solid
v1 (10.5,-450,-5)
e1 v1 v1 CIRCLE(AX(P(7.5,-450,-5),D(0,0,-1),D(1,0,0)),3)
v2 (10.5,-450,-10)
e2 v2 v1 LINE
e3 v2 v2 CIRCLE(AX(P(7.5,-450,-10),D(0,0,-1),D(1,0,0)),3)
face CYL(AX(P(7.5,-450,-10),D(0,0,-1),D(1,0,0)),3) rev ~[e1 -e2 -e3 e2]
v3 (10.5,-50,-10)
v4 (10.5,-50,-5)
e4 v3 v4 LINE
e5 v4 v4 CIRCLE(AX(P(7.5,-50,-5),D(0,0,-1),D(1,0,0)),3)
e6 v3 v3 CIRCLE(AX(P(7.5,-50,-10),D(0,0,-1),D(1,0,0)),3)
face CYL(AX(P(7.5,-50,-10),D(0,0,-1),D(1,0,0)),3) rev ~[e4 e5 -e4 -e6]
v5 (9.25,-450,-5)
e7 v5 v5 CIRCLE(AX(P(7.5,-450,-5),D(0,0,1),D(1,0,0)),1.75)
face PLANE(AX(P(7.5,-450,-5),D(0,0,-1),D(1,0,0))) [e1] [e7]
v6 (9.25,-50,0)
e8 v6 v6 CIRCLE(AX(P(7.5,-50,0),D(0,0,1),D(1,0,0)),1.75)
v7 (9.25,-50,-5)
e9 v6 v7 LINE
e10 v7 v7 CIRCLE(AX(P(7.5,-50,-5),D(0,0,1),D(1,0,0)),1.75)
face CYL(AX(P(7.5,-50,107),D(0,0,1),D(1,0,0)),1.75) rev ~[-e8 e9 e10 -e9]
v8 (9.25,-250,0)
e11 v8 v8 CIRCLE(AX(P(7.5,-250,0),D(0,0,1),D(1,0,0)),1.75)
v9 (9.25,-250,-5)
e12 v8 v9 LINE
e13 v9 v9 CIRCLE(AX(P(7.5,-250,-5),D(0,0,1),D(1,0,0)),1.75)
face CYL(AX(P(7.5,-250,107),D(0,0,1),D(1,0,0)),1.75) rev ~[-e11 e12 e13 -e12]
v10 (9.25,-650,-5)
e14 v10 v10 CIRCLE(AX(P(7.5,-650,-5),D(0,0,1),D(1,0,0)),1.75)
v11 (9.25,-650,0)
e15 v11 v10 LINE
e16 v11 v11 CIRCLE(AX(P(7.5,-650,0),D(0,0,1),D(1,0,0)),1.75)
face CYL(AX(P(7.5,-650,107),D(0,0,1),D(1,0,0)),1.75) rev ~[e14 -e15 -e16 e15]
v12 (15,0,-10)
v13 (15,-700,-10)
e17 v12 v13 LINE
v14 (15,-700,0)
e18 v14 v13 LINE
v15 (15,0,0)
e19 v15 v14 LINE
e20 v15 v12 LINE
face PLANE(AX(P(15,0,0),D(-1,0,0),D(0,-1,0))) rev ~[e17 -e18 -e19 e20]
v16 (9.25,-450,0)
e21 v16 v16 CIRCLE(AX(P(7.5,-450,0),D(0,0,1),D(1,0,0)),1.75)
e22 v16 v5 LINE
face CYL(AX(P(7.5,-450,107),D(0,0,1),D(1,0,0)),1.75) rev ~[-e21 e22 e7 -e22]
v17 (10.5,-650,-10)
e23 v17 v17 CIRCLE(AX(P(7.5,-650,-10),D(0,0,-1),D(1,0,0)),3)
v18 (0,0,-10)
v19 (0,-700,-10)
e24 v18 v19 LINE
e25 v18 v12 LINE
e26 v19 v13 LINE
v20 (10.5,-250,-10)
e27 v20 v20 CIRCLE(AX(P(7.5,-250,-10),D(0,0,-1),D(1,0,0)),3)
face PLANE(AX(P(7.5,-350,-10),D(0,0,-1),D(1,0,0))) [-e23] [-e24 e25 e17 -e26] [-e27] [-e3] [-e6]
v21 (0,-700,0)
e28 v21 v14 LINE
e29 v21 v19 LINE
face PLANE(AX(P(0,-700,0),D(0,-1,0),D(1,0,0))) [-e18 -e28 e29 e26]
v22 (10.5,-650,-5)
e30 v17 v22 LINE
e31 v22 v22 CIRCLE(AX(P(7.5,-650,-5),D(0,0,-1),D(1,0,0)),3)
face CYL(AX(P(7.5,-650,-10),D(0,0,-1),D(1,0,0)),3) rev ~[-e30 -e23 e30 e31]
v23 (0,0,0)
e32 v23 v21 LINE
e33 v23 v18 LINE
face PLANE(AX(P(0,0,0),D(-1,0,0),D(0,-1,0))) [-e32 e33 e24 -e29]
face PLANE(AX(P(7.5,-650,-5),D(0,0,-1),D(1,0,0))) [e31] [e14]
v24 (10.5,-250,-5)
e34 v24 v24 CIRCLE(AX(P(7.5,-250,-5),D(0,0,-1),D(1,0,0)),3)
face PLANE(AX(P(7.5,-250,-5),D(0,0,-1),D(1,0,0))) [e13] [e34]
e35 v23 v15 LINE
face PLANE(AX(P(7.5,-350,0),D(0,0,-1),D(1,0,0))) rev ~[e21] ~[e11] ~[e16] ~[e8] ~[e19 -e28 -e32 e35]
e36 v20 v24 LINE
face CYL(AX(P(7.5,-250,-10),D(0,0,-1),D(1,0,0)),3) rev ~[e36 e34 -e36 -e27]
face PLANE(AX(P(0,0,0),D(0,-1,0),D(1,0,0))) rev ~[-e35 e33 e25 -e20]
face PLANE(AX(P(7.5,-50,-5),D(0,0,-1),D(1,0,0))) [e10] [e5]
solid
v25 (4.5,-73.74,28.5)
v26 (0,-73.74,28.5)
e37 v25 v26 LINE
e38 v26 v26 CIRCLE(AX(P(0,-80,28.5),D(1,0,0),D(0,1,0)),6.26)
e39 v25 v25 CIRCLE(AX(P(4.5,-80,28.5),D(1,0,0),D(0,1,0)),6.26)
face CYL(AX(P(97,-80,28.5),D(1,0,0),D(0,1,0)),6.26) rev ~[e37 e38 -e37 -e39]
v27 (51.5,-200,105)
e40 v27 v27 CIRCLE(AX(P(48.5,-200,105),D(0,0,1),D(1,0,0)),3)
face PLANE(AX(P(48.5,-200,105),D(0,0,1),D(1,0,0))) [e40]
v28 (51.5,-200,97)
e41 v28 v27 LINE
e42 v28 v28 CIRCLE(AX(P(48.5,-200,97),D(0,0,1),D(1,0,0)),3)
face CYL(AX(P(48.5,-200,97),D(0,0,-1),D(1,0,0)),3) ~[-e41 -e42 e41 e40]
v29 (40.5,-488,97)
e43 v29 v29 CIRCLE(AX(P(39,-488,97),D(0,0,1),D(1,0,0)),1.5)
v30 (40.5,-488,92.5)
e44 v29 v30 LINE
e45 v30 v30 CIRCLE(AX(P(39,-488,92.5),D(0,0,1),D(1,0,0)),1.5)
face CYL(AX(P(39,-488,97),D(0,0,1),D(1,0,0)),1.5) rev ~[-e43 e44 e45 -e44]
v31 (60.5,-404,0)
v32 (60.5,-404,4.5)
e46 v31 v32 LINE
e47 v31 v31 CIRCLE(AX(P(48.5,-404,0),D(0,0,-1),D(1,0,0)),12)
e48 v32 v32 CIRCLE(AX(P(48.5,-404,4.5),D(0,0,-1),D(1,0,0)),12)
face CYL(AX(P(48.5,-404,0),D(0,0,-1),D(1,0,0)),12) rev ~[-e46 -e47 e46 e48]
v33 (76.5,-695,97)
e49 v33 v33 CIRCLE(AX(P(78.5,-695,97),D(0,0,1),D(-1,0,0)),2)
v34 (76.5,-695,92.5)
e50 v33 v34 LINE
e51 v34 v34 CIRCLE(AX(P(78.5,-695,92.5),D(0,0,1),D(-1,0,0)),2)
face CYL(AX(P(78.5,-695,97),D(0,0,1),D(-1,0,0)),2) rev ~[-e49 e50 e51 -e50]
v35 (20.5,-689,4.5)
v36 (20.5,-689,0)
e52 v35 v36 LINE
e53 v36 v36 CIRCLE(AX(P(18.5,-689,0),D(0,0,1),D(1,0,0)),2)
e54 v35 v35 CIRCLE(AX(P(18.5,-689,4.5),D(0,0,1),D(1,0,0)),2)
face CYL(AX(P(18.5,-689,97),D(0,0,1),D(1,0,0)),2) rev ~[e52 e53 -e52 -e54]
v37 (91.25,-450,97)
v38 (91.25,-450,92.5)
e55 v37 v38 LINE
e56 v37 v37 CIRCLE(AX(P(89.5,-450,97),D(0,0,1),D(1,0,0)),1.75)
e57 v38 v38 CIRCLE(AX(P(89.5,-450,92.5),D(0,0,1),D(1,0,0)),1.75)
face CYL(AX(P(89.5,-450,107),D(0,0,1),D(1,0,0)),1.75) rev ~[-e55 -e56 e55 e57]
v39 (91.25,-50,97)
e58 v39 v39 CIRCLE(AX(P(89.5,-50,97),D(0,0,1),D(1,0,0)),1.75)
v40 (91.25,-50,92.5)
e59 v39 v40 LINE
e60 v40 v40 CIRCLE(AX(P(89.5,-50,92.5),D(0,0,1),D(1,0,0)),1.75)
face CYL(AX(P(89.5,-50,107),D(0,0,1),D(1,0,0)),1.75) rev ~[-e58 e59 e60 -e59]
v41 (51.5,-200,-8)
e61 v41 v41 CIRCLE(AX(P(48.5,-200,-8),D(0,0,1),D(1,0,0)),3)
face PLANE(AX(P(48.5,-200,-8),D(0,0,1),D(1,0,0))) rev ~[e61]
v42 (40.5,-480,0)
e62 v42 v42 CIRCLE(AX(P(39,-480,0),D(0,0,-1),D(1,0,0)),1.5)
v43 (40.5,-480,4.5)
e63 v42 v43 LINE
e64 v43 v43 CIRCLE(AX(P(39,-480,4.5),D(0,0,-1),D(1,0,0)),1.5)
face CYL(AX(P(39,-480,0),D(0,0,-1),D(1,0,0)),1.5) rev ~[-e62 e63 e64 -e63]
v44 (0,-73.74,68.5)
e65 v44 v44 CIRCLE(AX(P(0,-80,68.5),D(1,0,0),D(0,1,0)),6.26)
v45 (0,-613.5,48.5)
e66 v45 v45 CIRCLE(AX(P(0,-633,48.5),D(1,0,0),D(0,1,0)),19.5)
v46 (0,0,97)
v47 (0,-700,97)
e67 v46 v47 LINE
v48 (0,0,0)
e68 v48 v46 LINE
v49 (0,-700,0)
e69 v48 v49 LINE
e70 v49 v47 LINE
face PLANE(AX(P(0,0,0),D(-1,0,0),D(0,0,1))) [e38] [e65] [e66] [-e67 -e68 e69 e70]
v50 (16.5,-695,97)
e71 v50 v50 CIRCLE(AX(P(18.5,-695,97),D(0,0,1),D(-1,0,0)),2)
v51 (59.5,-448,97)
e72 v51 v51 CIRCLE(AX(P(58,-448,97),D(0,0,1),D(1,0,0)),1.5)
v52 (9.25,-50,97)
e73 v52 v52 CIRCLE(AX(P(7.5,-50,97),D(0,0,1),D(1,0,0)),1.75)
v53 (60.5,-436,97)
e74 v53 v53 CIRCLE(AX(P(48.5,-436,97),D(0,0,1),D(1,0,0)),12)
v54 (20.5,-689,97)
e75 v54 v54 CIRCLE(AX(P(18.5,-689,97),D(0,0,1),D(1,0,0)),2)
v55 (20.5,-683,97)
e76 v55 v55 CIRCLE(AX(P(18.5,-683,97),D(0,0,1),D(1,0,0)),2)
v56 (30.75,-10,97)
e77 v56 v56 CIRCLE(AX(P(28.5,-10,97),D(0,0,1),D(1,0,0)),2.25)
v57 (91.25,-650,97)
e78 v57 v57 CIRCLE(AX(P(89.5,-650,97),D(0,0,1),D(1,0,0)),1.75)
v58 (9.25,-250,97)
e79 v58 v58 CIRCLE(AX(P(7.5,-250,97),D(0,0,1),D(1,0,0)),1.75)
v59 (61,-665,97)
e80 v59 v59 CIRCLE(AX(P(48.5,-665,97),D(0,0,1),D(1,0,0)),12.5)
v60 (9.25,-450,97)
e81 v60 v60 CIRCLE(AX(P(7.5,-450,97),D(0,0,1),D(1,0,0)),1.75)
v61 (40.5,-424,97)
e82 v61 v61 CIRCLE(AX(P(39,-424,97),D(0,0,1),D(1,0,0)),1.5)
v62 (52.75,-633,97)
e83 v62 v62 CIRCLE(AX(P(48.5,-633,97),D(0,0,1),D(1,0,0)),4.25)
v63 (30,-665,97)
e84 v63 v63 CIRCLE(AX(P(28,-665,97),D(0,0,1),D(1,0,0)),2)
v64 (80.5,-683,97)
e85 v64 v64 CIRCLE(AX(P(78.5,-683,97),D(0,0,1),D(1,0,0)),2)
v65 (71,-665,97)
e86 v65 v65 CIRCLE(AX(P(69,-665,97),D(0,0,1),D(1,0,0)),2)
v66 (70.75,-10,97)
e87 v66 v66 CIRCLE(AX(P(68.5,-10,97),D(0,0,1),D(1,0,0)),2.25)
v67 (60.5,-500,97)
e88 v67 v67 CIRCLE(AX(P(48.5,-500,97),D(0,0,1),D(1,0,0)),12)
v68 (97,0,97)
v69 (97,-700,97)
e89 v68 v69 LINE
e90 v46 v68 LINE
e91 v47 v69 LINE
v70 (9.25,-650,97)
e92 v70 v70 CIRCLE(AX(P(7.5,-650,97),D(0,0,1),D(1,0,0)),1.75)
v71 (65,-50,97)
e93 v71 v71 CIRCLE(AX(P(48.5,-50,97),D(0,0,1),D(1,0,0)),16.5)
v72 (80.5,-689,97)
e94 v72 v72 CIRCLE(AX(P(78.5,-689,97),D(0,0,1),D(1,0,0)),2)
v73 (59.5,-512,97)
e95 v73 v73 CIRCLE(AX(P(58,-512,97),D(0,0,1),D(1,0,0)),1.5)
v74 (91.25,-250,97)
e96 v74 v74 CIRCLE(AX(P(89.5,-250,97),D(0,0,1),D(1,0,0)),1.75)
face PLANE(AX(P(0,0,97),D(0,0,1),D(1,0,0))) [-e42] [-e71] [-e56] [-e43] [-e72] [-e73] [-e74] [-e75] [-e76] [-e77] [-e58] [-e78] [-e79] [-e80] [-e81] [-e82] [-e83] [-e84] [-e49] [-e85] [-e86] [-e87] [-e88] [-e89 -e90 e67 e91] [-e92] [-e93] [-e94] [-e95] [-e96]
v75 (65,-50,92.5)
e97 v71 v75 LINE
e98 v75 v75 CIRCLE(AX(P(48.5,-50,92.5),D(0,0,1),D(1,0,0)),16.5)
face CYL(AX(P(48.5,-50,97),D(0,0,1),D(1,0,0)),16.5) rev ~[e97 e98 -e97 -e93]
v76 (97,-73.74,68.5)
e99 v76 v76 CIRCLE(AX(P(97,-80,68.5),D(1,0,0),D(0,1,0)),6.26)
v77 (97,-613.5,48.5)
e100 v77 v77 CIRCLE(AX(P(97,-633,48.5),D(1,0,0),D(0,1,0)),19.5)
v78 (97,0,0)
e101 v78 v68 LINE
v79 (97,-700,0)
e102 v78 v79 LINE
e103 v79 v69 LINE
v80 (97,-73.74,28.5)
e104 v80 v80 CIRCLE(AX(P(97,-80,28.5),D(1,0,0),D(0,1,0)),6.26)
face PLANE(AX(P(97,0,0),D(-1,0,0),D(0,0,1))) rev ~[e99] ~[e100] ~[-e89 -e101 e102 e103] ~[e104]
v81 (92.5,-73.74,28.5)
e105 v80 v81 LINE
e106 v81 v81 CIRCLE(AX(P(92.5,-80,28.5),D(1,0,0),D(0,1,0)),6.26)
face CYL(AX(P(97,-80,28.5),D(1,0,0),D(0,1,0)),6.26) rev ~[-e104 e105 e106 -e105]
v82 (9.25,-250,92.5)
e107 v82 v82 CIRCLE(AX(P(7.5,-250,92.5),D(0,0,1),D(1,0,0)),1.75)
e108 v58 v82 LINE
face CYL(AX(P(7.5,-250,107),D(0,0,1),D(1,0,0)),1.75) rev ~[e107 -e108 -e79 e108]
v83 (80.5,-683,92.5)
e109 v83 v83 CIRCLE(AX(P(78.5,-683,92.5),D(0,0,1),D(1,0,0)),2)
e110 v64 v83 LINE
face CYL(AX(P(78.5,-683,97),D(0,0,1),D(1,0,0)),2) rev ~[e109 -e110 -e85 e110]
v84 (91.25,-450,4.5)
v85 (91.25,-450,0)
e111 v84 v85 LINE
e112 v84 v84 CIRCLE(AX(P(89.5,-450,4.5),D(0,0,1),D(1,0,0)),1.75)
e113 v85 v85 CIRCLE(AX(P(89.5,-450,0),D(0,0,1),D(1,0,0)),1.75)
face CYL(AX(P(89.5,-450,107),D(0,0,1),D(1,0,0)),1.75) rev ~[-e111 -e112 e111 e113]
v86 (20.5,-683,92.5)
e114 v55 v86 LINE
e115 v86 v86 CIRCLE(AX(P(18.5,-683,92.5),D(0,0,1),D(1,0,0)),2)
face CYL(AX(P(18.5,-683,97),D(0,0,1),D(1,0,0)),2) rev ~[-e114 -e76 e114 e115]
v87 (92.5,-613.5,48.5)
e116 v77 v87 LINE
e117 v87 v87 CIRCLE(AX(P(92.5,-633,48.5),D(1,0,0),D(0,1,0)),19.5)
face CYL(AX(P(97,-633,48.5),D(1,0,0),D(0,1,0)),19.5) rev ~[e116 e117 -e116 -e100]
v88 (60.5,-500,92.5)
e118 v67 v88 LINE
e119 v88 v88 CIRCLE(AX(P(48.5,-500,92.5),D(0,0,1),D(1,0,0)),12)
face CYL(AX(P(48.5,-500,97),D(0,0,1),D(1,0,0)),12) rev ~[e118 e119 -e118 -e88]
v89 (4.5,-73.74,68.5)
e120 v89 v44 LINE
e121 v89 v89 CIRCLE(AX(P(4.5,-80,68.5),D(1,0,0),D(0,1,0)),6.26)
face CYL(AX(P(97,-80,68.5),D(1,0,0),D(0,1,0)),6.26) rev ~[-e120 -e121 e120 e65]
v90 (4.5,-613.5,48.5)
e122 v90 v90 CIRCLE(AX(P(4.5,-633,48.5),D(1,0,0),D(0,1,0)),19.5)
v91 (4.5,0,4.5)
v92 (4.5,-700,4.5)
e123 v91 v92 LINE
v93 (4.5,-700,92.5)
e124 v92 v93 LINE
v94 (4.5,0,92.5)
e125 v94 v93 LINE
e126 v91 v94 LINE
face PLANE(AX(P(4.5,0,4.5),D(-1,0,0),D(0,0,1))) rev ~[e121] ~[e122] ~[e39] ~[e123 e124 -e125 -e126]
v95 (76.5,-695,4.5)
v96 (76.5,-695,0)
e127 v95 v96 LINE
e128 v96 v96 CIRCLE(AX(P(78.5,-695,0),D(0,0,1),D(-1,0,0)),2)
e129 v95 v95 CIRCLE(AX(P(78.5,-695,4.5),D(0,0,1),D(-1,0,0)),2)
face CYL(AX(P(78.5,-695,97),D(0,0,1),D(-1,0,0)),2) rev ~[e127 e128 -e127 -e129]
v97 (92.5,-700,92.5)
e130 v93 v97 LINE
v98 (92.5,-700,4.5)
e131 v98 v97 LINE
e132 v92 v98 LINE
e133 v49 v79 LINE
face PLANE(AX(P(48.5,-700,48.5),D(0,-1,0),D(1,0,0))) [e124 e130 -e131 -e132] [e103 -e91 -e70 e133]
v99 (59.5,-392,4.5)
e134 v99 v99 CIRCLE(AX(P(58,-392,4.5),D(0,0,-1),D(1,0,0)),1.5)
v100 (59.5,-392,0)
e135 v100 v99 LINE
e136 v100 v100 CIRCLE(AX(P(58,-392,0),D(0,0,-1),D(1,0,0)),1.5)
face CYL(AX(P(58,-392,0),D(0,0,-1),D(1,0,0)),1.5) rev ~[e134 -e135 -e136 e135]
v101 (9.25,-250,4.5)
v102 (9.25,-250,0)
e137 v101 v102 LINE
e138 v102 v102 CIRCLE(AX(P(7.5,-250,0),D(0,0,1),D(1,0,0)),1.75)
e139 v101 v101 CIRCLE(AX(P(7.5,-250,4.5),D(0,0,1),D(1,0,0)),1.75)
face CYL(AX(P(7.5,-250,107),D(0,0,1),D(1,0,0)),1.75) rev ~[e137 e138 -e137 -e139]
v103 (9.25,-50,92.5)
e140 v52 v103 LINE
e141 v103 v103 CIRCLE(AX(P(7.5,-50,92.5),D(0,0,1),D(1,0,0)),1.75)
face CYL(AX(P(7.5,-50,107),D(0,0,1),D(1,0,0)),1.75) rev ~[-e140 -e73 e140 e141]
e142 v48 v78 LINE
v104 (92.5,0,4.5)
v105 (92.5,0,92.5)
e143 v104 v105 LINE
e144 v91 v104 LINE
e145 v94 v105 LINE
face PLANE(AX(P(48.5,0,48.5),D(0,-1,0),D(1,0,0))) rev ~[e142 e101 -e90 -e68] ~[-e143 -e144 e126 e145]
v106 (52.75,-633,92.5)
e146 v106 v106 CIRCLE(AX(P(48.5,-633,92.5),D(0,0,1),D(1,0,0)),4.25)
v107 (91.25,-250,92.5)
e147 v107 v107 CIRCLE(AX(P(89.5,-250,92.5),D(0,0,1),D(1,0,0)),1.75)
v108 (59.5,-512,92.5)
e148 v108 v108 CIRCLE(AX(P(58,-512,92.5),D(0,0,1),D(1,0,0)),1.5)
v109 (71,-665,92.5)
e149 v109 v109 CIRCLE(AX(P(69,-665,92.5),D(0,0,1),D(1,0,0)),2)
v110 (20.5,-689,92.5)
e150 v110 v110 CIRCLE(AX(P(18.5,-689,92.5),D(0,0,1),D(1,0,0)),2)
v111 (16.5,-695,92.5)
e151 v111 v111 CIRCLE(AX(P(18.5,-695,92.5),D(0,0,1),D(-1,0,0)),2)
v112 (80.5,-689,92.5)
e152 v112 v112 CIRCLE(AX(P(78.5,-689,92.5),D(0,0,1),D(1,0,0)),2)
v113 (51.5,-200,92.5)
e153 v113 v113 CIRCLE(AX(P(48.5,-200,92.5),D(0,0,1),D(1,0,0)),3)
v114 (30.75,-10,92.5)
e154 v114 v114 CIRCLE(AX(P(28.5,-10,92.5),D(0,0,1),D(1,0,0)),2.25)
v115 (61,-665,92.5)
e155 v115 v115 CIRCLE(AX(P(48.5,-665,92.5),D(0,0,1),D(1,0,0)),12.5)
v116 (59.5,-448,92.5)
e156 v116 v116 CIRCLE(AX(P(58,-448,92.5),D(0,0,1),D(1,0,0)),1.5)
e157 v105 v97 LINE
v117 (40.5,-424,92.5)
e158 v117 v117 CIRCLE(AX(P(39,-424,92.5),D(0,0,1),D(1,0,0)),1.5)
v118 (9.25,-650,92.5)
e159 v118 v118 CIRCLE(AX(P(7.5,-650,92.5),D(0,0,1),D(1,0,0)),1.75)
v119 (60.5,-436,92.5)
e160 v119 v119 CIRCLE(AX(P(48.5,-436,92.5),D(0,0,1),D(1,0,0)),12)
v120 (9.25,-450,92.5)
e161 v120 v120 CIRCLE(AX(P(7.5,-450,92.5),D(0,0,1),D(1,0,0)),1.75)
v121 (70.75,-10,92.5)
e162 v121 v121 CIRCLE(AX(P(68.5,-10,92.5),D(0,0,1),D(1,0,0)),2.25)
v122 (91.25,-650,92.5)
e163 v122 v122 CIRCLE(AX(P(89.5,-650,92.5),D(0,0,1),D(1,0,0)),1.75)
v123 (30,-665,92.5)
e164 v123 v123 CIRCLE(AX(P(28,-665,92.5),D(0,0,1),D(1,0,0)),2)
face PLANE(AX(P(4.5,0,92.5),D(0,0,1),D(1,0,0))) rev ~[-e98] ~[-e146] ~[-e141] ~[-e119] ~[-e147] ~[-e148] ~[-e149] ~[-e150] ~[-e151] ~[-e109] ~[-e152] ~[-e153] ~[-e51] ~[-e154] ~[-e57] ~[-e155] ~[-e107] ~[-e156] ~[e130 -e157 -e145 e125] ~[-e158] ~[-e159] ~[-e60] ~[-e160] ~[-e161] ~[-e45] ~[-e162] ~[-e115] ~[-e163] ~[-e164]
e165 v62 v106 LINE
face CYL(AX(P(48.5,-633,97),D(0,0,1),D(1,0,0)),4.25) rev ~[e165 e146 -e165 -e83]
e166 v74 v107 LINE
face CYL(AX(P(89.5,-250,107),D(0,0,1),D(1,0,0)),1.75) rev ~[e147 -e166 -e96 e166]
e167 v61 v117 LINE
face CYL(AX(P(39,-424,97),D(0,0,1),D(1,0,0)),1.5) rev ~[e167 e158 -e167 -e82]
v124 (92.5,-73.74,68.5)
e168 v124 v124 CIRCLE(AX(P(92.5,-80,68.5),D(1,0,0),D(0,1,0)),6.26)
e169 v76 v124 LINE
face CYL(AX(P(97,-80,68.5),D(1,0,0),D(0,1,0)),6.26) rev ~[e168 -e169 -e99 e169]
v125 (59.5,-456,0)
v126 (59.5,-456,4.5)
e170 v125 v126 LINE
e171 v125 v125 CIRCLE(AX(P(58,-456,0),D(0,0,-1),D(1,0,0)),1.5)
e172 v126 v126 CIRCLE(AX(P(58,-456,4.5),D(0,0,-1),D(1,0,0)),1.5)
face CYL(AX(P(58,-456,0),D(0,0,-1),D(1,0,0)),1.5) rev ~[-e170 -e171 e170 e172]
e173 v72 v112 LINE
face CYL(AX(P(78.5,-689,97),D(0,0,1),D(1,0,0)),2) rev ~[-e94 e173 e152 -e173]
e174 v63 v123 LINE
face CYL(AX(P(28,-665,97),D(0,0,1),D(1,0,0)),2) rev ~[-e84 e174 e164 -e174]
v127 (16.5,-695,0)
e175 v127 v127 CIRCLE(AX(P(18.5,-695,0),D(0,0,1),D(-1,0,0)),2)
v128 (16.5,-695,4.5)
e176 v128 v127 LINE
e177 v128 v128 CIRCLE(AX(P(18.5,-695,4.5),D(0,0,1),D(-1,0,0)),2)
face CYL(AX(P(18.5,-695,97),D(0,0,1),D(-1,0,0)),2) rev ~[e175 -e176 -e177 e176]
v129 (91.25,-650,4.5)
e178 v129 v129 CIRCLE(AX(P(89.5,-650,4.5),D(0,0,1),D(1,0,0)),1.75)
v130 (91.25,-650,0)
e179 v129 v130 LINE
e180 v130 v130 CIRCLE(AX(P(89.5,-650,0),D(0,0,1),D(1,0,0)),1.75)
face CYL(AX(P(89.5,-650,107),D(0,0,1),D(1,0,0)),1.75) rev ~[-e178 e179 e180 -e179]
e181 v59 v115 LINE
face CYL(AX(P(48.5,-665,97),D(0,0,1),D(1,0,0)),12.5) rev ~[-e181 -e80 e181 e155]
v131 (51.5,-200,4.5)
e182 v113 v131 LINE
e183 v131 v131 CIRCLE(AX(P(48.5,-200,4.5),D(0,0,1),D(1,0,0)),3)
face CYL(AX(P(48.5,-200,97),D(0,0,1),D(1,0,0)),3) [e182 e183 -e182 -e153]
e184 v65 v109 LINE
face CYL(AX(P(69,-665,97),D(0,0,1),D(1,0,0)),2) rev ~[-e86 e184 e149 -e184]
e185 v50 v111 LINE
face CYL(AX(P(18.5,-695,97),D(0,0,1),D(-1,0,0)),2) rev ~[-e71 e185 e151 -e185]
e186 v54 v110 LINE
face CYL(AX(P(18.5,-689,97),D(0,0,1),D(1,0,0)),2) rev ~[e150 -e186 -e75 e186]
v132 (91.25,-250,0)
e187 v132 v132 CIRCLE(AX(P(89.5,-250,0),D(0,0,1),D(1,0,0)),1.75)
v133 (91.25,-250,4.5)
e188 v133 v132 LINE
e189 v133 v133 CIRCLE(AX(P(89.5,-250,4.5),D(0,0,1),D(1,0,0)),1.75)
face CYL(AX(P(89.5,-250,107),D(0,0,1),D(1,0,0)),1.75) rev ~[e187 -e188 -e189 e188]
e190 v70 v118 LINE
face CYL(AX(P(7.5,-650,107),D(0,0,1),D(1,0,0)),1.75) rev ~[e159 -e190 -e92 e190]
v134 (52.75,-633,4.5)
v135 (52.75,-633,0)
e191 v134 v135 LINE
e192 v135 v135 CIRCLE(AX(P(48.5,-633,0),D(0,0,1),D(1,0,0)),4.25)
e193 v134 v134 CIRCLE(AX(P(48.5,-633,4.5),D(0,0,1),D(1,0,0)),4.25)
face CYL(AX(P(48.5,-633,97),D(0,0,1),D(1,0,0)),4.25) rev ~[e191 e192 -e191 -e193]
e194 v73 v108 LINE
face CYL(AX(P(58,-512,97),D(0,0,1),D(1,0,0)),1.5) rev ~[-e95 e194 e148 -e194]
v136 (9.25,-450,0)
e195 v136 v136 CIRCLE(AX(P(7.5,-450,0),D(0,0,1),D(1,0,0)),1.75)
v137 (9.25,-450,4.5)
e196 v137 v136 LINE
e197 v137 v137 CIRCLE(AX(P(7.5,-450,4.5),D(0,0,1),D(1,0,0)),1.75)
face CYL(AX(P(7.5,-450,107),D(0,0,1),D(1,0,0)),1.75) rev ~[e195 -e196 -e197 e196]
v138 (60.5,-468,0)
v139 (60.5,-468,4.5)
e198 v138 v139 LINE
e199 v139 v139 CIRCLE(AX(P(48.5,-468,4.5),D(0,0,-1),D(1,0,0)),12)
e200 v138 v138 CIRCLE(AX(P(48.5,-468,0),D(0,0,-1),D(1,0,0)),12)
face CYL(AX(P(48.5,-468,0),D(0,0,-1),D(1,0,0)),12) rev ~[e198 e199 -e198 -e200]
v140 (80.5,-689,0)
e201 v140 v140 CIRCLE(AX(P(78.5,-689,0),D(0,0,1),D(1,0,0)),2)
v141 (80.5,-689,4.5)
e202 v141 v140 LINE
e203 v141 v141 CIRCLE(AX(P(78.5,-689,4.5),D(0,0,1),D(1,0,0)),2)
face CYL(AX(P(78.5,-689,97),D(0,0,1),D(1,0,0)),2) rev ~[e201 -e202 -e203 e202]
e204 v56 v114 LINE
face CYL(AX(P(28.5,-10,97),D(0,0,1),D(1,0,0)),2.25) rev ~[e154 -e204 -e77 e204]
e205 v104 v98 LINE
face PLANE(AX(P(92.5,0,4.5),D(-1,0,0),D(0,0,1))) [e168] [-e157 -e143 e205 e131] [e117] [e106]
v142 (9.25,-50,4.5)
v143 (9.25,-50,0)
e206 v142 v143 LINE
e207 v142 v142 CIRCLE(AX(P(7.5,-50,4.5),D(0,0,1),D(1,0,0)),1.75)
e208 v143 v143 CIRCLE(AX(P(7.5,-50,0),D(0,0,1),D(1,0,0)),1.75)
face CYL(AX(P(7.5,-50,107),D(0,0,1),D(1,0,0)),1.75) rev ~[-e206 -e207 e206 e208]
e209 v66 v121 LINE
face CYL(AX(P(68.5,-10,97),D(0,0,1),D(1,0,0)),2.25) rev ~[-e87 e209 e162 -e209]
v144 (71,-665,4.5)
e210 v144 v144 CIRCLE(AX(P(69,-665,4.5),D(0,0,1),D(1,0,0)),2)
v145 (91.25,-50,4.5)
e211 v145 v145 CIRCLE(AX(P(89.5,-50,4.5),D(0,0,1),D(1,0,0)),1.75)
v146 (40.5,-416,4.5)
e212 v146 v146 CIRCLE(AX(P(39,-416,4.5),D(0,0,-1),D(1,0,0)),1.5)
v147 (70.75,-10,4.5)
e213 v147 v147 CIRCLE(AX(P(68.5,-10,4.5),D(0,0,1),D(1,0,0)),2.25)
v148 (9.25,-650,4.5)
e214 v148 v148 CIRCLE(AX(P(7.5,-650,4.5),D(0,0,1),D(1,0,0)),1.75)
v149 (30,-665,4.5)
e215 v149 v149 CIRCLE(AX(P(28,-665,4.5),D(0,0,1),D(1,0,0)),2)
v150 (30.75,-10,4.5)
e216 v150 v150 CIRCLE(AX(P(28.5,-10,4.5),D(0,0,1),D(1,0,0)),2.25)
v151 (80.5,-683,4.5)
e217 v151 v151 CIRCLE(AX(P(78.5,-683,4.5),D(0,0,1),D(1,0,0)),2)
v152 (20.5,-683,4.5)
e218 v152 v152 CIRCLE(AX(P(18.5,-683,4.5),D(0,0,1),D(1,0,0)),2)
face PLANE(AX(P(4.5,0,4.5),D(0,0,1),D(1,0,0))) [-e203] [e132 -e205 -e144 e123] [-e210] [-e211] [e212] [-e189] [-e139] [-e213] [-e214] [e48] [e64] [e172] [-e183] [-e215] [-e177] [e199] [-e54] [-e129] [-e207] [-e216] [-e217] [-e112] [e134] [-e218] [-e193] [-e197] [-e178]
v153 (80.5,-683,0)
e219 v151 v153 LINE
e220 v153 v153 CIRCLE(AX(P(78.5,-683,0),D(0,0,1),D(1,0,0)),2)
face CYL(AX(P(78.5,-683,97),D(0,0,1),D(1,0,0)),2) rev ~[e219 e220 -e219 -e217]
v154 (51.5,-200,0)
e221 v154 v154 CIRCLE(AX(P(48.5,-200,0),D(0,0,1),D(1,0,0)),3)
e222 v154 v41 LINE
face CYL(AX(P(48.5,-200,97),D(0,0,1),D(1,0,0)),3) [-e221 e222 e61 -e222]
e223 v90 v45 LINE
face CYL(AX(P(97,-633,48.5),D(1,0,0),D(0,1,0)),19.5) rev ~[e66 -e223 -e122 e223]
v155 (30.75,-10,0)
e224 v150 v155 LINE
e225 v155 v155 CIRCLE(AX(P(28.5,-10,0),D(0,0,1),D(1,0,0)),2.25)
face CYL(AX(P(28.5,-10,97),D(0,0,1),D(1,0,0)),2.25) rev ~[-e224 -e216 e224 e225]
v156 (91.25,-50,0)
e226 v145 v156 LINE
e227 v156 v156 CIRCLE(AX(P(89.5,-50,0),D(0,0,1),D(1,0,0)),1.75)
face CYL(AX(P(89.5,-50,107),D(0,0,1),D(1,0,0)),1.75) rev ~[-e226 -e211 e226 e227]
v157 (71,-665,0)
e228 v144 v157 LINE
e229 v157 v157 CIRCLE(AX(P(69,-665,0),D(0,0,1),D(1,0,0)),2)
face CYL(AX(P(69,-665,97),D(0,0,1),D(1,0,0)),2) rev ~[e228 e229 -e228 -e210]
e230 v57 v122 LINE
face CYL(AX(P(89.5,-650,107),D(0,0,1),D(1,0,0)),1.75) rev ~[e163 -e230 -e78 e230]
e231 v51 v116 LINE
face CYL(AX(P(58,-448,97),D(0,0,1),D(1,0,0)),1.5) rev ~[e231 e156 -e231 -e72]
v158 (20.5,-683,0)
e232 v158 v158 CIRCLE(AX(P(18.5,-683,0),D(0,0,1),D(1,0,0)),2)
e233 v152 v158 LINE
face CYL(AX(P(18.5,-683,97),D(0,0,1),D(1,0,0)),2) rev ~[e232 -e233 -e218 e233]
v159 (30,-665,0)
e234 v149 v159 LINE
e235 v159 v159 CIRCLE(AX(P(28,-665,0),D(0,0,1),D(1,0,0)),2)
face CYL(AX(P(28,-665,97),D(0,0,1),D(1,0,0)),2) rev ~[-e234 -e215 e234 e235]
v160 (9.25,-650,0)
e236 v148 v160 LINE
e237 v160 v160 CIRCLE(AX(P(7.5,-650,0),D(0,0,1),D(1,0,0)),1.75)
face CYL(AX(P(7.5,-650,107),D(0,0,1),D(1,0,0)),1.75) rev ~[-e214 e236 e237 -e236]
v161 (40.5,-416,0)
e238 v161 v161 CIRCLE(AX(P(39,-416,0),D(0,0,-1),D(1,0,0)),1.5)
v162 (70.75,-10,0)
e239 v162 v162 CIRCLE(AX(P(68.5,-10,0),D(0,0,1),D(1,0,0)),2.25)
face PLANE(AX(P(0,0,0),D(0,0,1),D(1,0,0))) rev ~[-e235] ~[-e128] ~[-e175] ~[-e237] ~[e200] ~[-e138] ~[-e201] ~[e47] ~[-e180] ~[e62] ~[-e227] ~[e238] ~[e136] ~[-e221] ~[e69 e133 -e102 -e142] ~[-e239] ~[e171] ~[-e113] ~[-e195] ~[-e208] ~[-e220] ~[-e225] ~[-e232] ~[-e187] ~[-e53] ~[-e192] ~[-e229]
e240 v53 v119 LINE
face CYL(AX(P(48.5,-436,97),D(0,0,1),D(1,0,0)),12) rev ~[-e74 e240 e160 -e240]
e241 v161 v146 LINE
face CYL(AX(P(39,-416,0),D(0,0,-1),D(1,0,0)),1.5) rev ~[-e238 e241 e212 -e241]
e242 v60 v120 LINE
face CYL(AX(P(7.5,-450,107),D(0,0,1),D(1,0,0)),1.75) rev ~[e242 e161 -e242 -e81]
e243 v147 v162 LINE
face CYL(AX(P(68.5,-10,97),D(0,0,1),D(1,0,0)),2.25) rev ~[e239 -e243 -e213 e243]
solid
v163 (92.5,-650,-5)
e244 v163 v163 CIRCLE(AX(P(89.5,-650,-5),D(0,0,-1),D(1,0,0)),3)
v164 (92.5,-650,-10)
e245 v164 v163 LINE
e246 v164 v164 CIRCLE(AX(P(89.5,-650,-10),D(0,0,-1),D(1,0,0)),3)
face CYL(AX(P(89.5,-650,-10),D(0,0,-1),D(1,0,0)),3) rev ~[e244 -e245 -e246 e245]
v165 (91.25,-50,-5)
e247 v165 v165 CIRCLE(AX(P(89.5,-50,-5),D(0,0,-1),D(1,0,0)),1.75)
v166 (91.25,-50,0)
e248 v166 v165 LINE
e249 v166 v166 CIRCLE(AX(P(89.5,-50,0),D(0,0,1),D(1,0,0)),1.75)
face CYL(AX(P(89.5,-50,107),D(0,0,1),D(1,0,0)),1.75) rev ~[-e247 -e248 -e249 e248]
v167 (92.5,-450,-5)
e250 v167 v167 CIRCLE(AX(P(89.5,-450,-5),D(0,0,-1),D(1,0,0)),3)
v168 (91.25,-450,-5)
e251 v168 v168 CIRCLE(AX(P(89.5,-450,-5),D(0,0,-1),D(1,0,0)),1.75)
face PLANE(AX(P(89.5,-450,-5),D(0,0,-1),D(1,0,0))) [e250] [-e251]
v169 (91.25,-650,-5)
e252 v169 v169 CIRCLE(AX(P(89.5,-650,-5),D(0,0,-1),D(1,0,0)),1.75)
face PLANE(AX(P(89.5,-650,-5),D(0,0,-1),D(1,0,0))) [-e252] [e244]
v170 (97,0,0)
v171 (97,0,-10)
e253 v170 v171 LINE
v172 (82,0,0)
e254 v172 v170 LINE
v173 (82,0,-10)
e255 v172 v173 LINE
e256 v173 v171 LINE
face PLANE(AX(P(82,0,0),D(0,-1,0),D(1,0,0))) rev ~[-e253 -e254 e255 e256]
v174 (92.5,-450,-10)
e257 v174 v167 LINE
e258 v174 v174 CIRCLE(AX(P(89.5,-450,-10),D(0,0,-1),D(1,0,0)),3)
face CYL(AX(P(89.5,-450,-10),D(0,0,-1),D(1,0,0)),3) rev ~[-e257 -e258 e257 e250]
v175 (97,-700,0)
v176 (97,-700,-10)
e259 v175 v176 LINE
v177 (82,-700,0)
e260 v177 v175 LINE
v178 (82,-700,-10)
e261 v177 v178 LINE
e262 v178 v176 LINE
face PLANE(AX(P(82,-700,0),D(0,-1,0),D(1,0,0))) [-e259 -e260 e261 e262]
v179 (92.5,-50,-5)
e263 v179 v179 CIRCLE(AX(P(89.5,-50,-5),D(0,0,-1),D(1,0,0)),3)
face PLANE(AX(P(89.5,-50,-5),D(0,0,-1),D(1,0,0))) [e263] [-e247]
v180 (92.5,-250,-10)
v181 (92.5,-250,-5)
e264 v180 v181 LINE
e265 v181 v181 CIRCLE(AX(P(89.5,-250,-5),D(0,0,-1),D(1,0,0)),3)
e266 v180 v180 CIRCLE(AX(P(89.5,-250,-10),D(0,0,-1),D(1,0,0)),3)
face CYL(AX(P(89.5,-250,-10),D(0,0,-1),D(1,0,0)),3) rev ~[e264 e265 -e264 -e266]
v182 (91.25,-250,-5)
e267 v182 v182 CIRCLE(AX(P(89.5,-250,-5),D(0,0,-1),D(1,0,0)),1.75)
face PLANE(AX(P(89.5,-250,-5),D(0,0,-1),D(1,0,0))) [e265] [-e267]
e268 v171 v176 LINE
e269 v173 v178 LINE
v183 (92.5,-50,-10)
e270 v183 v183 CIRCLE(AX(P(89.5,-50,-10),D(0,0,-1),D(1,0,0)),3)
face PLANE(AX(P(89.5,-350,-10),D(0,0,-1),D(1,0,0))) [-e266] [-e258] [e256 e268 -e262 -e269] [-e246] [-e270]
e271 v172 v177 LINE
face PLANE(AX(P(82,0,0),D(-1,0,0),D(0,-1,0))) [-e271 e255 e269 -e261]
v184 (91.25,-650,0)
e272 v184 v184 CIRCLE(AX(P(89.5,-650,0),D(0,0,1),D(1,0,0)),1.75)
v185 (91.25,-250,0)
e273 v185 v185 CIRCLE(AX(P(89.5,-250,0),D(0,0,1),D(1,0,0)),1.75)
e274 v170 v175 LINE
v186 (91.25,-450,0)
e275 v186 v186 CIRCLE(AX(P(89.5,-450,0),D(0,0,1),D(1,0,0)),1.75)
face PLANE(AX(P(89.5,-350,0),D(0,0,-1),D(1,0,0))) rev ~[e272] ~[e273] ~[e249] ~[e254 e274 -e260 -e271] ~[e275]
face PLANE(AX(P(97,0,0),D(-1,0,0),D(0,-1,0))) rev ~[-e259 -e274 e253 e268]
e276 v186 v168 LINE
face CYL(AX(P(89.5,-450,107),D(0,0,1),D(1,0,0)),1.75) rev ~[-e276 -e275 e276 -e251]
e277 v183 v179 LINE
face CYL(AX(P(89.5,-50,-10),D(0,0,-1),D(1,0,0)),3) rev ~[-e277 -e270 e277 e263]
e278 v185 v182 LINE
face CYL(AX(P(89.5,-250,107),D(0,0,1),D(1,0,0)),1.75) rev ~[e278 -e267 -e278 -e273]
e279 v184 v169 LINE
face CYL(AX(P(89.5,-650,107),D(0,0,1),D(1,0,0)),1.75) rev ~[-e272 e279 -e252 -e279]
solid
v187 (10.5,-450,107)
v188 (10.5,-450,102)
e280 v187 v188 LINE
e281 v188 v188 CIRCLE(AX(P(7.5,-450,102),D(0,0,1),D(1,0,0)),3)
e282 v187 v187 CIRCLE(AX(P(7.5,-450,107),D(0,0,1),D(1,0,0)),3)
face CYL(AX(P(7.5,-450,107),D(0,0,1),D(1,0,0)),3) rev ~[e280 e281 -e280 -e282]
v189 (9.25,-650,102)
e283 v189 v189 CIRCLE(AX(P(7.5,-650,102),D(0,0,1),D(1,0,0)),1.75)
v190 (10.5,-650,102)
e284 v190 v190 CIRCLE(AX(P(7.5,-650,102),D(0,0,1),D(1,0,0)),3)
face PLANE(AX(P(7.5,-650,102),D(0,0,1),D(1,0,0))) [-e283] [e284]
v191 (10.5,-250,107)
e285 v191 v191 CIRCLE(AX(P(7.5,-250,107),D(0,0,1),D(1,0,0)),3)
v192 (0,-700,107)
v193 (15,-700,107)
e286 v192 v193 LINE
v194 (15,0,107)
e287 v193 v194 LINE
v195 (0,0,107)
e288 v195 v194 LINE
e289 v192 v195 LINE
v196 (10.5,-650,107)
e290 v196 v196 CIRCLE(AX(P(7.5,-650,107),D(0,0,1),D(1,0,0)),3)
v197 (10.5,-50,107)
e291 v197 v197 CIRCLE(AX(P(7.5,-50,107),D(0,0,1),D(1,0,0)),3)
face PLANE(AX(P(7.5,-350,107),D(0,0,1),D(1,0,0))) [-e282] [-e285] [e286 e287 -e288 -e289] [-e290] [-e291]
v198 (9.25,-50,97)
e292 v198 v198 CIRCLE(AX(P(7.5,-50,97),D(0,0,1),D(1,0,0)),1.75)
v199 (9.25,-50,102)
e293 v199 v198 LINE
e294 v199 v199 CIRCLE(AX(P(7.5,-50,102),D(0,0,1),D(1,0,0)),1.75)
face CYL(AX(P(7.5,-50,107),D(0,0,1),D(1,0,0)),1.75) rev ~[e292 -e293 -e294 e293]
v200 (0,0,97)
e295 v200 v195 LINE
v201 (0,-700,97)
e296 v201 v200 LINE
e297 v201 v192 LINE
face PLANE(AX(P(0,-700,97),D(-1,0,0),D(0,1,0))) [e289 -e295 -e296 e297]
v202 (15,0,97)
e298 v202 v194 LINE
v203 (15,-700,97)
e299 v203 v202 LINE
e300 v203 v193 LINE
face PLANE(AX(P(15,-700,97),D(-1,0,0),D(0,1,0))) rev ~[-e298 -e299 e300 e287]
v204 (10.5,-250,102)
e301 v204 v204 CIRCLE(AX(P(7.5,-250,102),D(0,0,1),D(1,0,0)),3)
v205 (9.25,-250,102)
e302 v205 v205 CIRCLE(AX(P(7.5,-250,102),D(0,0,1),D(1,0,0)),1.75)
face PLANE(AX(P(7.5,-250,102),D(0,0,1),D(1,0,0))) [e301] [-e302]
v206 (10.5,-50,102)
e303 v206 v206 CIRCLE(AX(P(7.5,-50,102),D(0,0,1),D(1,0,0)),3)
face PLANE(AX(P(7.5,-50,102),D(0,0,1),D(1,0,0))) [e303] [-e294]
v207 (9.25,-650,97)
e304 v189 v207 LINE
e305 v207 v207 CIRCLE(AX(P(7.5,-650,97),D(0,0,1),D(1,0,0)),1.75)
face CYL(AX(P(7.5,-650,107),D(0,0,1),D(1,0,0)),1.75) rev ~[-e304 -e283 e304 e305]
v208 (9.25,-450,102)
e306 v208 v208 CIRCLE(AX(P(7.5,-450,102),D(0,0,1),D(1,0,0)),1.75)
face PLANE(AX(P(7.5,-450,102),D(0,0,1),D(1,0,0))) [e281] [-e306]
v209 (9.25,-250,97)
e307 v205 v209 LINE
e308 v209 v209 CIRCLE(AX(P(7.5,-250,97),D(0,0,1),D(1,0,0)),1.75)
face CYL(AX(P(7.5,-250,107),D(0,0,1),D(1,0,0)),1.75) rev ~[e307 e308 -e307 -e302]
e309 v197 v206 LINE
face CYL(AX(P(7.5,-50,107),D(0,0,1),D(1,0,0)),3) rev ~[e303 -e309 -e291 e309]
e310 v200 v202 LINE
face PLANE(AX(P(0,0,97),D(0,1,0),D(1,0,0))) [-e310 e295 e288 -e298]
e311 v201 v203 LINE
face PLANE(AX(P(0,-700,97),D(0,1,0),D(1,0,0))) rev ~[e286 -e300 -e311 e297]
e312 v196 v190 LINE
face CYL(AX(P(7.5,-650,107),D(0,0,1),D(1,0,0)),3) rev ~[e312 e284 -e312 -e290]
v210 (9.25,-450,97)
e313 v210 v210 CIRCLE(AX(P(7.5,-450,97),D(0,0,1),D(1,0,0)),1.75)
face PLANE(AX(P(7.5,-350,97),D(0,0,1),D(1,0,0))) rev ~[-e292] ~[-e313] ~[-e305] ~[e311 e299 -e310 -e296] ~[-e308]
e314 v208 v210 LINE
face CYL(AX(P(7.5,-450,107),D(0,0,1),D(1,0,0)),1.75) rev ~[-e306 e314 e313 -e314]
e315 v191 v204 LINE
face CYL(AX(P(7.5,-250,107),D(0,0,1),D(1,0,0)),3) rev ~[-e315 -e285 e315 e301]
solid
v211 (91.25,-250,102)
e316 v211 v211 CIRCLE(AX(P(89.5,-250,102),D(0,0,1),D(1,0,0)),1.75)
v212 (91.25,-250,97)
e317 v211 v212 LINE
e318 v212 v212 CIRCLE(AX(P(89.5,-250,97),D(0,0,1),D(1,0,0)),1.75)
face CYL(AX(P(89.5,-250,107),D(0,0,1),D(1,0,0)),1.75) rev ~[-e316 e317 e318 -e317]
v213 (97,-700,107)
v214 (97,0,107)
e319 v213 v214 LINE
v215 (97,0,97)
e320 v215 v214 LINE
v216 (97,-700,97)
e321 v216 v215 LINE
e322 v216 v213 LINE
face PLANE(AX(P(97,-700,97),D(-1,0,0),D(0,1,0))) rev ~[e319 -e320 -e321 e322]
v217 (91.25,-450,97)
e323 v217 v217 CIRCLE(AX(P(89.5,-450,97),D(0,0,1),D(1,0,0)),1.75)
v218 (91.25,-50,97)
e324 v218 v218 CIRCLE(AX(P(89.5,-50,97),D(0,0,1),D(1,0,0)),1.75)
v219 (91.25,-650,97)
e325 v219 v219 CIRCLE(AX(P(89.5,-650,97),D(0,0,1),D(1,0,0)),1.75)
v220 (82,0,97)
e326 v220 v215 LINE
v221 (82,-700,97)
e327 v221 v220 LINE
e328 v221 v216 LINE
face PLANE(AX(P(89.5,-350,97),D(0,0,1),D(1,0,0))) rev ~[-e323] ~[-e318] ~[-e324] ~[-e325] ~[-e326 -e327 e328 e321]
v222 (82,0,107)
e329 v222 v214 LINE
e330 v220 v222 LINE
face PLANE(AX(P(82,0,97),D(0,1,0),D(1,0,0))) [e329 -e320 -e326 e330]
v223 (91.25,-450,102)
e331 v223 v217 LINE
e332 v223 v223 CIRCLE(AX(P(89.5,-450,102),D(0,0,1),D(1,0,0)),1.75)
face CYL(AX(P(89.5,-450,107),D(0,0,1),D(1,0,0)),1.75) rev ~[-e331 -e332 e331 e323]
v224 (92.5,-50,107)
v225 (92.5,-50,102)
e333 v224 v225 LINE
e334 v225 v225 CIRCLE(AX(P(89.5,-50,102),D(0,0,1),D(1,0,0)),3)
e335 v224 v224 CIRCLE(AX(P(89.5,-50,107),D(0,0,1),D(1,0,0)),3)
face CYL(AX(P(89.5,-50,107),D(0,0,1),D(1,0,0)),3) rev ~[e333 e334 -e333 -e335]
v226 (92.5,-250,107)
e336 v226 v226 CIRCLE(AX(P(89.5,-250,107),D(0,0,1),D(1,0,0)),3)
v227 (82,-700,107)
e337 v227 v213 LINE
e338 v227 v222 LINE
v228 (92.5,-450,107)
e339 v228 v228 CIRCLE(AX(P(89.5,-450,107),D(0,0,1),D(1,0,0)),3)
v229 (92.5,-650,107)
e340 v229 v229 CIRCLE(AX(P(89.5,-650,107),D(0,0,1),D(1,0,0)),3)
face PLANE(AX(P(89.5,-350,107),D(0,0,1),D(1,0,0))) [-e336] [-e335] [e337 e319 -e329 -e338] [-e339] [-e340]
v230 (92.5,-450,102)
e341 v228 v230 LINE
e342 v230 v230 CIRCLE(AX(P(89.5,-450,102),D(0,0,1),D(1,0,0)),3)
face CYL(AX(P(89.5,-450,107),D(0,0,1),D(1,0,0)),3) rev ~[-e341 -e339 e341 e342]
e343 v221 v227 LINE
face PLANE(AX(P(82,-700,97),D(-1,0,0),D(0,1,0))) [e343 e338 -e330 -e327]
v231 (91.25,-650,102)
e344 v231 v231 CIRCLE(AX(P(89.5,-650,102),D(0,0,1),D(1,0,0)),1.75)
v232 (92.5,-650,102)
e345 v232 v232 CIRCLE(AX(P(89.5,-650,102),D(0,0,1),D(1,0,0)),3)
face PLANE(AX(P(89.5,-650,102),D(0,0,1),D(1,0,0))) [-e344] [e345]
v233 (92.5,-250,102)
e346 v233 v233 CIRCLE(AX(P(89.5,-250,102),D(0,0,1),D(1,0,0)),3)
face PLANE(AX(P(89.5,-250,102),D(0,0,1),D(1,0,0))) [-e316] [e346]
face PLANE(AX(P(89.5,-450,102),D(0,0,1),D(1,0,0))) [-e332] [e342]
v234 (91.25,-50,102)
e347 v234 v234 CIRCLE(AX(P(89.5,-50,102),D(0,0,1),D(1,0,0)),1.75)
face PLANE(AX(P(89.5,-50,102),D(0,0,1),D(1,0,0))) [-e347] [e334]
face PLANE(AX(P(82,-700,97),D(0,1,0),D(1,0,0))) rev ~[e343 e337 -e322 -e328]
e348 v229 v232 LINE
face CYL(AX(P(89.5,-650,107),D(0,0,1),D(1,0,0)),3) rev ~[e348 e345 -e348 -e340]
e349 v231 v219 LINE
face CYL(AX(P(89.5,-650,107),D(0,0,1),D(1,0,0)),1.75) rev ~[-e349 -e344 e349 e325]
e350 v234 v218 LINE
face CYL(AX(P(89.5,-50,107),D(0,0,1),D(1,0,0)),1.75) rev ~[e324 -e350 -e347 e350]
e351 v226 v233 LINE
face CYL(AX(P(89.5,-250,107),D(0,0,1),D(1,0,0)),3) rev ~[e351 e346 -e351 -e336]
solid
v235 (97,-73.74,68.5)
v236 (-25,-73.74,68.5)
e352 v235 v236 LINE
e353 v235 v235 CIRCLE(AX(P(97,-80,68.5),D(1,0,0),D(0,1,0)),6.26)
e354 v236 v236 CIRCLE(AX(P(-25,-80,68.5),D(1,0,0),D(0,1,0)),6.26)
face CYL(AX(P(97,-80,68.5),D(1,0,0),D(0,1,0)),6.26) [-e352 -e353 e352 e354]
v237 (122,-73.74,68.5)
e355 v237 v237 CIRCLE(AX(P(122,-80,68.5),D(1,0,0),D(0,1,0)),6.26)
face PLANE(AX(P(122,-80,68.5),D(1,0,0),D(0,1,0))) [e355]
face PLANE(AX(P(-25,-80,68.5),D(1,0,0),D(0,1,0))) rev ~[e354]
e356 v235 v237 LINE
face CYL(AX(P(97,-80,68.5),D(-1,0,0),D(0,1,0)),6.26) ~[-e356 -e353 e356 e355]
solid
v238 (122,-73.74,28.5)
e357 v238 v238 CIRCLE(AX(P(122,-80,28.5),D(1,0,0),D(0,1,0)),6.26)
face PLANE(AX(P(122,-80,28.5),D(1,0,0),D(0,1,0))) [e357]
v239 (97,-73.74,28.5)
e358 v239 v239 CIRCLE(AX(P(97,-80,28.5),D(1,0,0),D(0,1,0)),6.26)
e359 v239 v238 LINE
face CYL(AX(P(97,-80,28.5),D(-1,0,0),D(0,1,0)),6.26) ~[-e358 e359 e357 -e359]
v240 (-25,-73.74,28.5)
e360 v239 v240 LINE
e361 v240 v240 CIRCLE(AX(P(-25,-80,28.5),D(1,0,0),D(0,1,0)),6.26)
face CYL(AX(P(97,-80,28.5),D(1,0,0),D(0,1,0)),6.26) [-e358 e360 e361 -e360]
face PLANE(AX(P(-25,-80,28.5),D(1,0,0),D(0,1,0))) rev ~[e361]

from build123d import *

# Parameters (mm, degrees)
F0_W           = 97
F0_H           = 97
F0_W_2         = 88
F0_H_2         = 88
F1_DEPTH       = 700
F2_W           = 15
F2_H           = 700
F3_DEPTH       = 10
F4_W           = 15
F4_H           = 700
F5_DEPTH       = 10
F6_R           = 12.5
F6_R_2         = 12
F6_R_3         = 1.5
F7_DEPTH       = 25
F6_R_4         = 4.25
F6_R_5         = 2
F8_DEPTH       = 150
F9_R           = 12
F9_R_2         = 1.5
F10_DEPTH      = 25
F11_R          = 19.5
F11_R_2        = 6.26
F12_DEPTH      = 150
F13_DEPTH      = 150
F6_R_6         = 2.25
F14_DEPTH      = 150
F6_R_7         = 16.5
F15_DEPTH      = 50
F16_DEPTH      = 122
F16_DEPTH_BACK = 25
F17_DEPTH      = 122
F17_DEPTH_BACK = 25
F18_R          = 1.75
F19_DEPTH      = 150
F18_R_2        = 3
F20_DEPTH      = 5
F21_R          = 3
F21_R_2        = 1.75
F22_DEPTH      = 5
F6_R_8         = 3
F23_DEPTH      = 120
F24_DEPTH      = 8
F24_DEPTH_BACK = 105
F25_DEPTH      = 150


with BuildPart() as f1:
    # F0 (on Front) → F1 (new body)
    with BuildSketch(Plane.XZ):
        with Locations((48.5, 48.5)):
            Rectangle(F0_W, F0_H)
        with Locations((48.5, 48.5)):
            Rectangle(F0_W_2, F0_H_2, mode=Mode.SUBTRACT)
    extrude(amount=F1_DEPTH)

    # F6 (on face) → F7 (cut)
    with BuildSketch(Plane.XY.offset(97)):
        with Locations((48.5, -665)):
            Circle(F6_R)
        with Locations((48.5, -500)):
            Circle(F6_R_2)
        with Locations((48.5, -436)):
            Circle(F6_R_2)
        with Locations((58, -448)):
            Circle(F6_R_3)
        with Locations((39, -424)):
            Circle(F6_R_3)
        with Locations((39, -488)):
            Circle(F6_R_3)
        with Locations((58, -512)):
            Circle(F6_R_3)
    extrude(amount=-F7_DEPTH, mode=Mode.SUBTRACT)

    # F6 (on face) → F8 (cut)
    with BuildSketch(Plane.XY.offset(97)):
        with Locations((48.5, -633)):
            Circle(F6_R_4)
        with Locations((69, -665)):
            Circle(F6_R_5)
        with Locations((28, -665)):
            Circle(F6_R_5)
    extrude(amount=-F8_DEPTH, mode=Mode.SUBTRACT)

    # F9 (on face) → F10 (cut)
    with BuildSketch(Plane(origin=(0, 0, 0), x_dir=(1, 0, 0), z_dir=(0, 0, -1))):
        with Locations((48.5, 468)):
            Circle(F9_R)
        with Locations((39, 480)):
            Circle(F9_R_2)
        with Locations((58, 456)):
            Circle(F9_R_2)
        with Locations((48.5, 404)):
            Circle(F9_R)
        with Locations((58, 392)):
            Circle(F9_R_2)
        with Locations((39, 416)):
            Circle(F9_R_2)
    extrude(amount=-F10_DEPTH, mode=Mode.SUBTRACT)

    # F11 (on face) → F12 (cut)
    with BuildSketch(Plane.YZ.offset(97)):
        with Locations((-633, 48.5)):
            Circle(F11_R)
        with Locations((-80, 68.5)):
            Circle(F11_R_2)
        with Locations((-80, 28.5)):
            Circle(F11_R_2)
    extrude(amount=-F12_DEPTH, mode=Mode.SUBTRACT)

    # F6 (on face) → F13 (cut)
    with BuildSketch(Plane.XY.offset(97)):
        with BuildLine():
            ThreePointArc((16.5, -683), (18.5, -685), (20.5, -683))
            ThreePointArc((20.5, -683), (18.5, -681), (16.5, -683))
        make_face()
        with BuildLine():
            ThreePointArc((76.5, -683), (78.5, -685), (80.5, -683))
            ThreePointArc((80.5, -683), (78.5, -681), (76.5, -683))
        make_face()
    extrude(amount=-F13_DEPTH, mode=Mode.SUBTRACT)

    # F6 (on face) → F14 (cut)
    with BuildSketch(Plane.XY.offset(97)):
        with Locations((28.5, -10)):
            Circle(F6_R_6)
        with Locations((68.5, -10)):
            Circle(F6_R_6)
    extrude(amount=-F14_DEPTH, mode=Mode.SUBTRACT)

    # F6 (on face) → F15 (cut)
    with BuildSketch(Plane.XY.offset(97)):
        with Locations((48.5, -50)):
            Circle(F6_R_7)
    extrude(amount=-F15_DEPTH, mode=Mode.SUBTRACT)


with BuildPart() as f3:
    # F2 (on face) → F3 (new body)
    with BuildSketch(Plane.XY.offset(97)):
        with Locations((7.5, -350)):
            Rectangle(F2_W, F2_H)
    extrude(amount=F3_DEPTH)


with BuildPart() as f3b:
    # F2 (on face) → F3, piece 2 (new body)
    with BuildSketch(Plane.XY.offset(97)):
        with Locations((89.5, -350)):
            Rectangle(F2_W, F2_H)
    extrude(amount=F3_DEPTH)


with BuildPart() as f5:
    # F4 (on face) → F5 (new body)
    with BuildSketch(Plane(origin=(0, 0, 0), x_dir=(1, 0, 0), z_dir=(0, 0, -1))):
        with Locations((7.5, 350)):
            Rectangle(F4_W, F4_H)
    extrude(amount=F5_DEPTH)


with BuildPart() as f5b:
    # F4 (on face) → F5, piece 2 (new body)
    with BuildSketch(Plane(origin=(0, 0, 0), x_dir=(1, 0, 0), z_dir=(0, 0, -1))):
        with Locations((89.5, 350)):
            Rectangle(F4_W, F4_H)
    extrude(amount=F5_DEPTH)


with BuildPart() as f16:
    # F11 (on face) → F16 (new body, two sides)
    with BuildSketch(Plane.YZ.offset(97)) as f16_sk:
        with Locations((-80, 68.5)):
            Circle(F11_R_2)
    extrude(amount=-F16_DEPTH)
    extrude(f16_sk.sketch, amount=F16_DEPTH_BACK)


with BuildPart() as f17:
    # F11 (on face) → F17 (new body, two sides)
    with BuildSketch(Plane.YZ.offset(97)) as f17_sk:
        with Locations((-80, 28.5)):
            Circle(F11_R_2)
    extrude(amount=-F17_DEPTH)
    extrude(f17_sk.sketch, amount=F17_DEPTH_BACK)


with BuildPart() as f19_tool:
    # F18 (on face) → F19 (new body)
    with BuildSketch(Plane.XY.offset(107)):
        with Locations((7.5, -650)):
            Circle(F18_R)
        with Locations((7.5, -450)):
            Circle(F18_R)
        with Locations((7.5, -250)):
            Circle(F18_R)
        with Locations((7.5, -50)):
            Circle(F18_R)
        with Locations((89.5, -50)):
            Circle(F18_R)
        with Locations((89.5, -250)):
            Circle(F18_R)
        with Locations((89.5, -450)):
            Circle(F18_R)
        with Locations((89.5, -650)):
            Circle(F18_R)
    extrude(amount=-F19_DEPTH)


with BuildPart() as f1_1:
    add(f1.part)

    # F19: cut by f19_tool
    add(f19_tool.part, mode=Mode.SUBTRACT)

    # F6 (on face) → F23 (cut)
    with BuildSketch(Plane.XY.offset(97)):
        with Locations((48.5, -200)):
            Circle(F6_R_8)
    extrude(amount=-F23_DEPTH, mode=Mode.SUBTRACT)

    # F6 (on face) → F24 (join, two sides)
    with BuildSketch(Plane.XY.offset(97)) as f24_sk:
        with Locations((48.5, -200)):
            Circle(F6_R_8)
    extrude(amount=F24_DEPTH)
    extrude(f24_sk.sketch, amount=-F24_DEPTH_BACK)

    # F6 (on face) → F25 (cut)
    with BuildSketch(Plane.XY.offset(97)):
        with BuildLine():
            ThreePointArc((20.5, -695), (18.5, -693), (16.5, -695))
            ThreePointArc((16.5, -695), (18.5, -697), (20.5, -695))
        make_face()
        with BuildLine():
            ThreePointArc((80.5, -695), (78.5, -693), (76.5, -695))
            ThreePointArc((76.5, -695), (78.5, -697), (80.5, -695))
        make_face()
        with Locations((18.5, -689)):
            Circle(F6_R_5)
        with Locations((78.5, -689)):
            Circle(F6_R_5)
    extrude(amount=-F25_DEPTH, mode=Mode.SUBTRACT)


with BuildPart() as f3_1:
    add(f3.part)

    # F19: cut by f19_tool
    add(f19_tool.part, mode=Mode.SUBTRACT)


with BuildPart() as f3b_1:
    add(f3b.part)

    # F19: cut by f19_tool
    add(f19_tool.part, mode=Mode.SUBTRACT)


with BuildPart() as f5_1:
    add(f5.part)

    # F19: cut by f19_tool
    add(f19_tool.part, mode=Mode.SUBTRACT)


with BuildPart() as f5b_1:
    add(f5b.part)

    # F19: cut by f19_tool
    add(f19_tool.part, mode=Mode.SUBTRACT)


with BuildPart() as f20_tool:
    # F18 (on face) → F20 (new body)
    with BuildSketch(Plane.XY.offset(107)):
        with Locations((7.5, -650)):
            Circle(F18_R_2)
        with Locations((7.5, -650)):
            Circle(F18_R, mode=Mode.SUBTRACT)
        with Locations((89.5, -650)):
            Circle(F18_R_2)
        with Locations((89.5, -650)):
            Circle(F18_R, mode=Mode.SUBTRACT)
        with Locations((7.5, -450)):
            Circle(F18_R_2)
        with Locations((7.5, -450)):
            Circle(F18_R, mode=Mode.SUBTRACT)
        with Locations((89.5, -450)):
            Circle(F18_R_2)
        with Locations((89.5, -450)):
            Circle(F18_R, mode=Mode.SUBTRACT)
        with Locations((7.5, -250)):
            Circle(F18_R_2)
        with Locations((7.5, -250)):
            Circle(F18_R, mode=Mode.SUBTRACT)
        with Locations((89.5, -250)):
            Circle(F18_R_2)
        with Locations((89.5, -250)):
            Circle(F18_R, mode=Mode.SUBTRACT)
        with Locations((7.5, -50)):
            Circle(F18_R_2)
        with Locations((7.5, -50)):
            Circle(F18_R, mode=Mode.SUBTRACT)
        with Locations((89.5, -50)):
            Circle(F18_R_2)
        with Locations((89.5, -50)):
            Circle(F18_R, mode=Mode.SUBTRACT)
    extrude(amount=-F20_DEPTH)


with BuildPart() as f3_2:
    add(f3_1.part)

    # F20: cut by f20_tool
    add(f20_tool.part, mode=Mode.SUBTRACT)


with BuildPart() as f3b_2:
    add(f3b_1.part)

    # F20: cut by f20_tool
    add(f20_tool.part, mode=Mode.SUBTRACT)


with BuildPart() as f22_tool:
    # F21 (on face) → F22 (new body)
    with BuildSketch(Plane(origin=(0, 0, -10), x_dir=(1, 0, 0), z_dir=(0, 0, -1))):
        with Locations((89.5, 50)):
            Circle(F21_R)
        with Locations((89.5, 50)):
            Circle(F21_R_2, mode=Mode.SUBTRACT)
        with Locations((7.5, 50)):
            Circle(F21_R)
        with Locations((89.5, 250)):
            Circle(F21_R)
        with Locations((89.5, 250)):
            Circle(F21_R_2, mode=Mode.SUBTRACT)
        with Locations((7.5, 250)):
            Circle(F21_R)
        with Locations((7.5, 450)):
            Circle(F21_R)
        with Locations((89.5, 450)):
            Circle(F21_R)
        with Locations((89.5, 450)):
            Circle(F21_R_2, mode=Mode.SUBTRACT)
        with Locations((7.5, 650)):
            Circle(F21_R)
        with Locations((89.5, 650)):
            Circle(F21_R)
        with Locations((89.5, 650)):
            Circle(F21_R_2, mode=Mode.SUBTRACT)
    extrude(amount=-F22_DEPTH)


with BuildPart() as f5_2:
    add(f5_1.part)

    # F22: cut by f22_tool
    add(f22_tool.part, mode=Mode.SUBTRACT)


with BuildPart() as f5b_2:
    add(f5b_1.part)

    # F22: cut by f22_tool
    add(f22_tool.part, mode=Mode.SUBTRACT)


solid = Compound([f16.part, f17.part, f1_1.part, f3_2.part, f3b_2.part, f5_2.part, f5b_2.part])
